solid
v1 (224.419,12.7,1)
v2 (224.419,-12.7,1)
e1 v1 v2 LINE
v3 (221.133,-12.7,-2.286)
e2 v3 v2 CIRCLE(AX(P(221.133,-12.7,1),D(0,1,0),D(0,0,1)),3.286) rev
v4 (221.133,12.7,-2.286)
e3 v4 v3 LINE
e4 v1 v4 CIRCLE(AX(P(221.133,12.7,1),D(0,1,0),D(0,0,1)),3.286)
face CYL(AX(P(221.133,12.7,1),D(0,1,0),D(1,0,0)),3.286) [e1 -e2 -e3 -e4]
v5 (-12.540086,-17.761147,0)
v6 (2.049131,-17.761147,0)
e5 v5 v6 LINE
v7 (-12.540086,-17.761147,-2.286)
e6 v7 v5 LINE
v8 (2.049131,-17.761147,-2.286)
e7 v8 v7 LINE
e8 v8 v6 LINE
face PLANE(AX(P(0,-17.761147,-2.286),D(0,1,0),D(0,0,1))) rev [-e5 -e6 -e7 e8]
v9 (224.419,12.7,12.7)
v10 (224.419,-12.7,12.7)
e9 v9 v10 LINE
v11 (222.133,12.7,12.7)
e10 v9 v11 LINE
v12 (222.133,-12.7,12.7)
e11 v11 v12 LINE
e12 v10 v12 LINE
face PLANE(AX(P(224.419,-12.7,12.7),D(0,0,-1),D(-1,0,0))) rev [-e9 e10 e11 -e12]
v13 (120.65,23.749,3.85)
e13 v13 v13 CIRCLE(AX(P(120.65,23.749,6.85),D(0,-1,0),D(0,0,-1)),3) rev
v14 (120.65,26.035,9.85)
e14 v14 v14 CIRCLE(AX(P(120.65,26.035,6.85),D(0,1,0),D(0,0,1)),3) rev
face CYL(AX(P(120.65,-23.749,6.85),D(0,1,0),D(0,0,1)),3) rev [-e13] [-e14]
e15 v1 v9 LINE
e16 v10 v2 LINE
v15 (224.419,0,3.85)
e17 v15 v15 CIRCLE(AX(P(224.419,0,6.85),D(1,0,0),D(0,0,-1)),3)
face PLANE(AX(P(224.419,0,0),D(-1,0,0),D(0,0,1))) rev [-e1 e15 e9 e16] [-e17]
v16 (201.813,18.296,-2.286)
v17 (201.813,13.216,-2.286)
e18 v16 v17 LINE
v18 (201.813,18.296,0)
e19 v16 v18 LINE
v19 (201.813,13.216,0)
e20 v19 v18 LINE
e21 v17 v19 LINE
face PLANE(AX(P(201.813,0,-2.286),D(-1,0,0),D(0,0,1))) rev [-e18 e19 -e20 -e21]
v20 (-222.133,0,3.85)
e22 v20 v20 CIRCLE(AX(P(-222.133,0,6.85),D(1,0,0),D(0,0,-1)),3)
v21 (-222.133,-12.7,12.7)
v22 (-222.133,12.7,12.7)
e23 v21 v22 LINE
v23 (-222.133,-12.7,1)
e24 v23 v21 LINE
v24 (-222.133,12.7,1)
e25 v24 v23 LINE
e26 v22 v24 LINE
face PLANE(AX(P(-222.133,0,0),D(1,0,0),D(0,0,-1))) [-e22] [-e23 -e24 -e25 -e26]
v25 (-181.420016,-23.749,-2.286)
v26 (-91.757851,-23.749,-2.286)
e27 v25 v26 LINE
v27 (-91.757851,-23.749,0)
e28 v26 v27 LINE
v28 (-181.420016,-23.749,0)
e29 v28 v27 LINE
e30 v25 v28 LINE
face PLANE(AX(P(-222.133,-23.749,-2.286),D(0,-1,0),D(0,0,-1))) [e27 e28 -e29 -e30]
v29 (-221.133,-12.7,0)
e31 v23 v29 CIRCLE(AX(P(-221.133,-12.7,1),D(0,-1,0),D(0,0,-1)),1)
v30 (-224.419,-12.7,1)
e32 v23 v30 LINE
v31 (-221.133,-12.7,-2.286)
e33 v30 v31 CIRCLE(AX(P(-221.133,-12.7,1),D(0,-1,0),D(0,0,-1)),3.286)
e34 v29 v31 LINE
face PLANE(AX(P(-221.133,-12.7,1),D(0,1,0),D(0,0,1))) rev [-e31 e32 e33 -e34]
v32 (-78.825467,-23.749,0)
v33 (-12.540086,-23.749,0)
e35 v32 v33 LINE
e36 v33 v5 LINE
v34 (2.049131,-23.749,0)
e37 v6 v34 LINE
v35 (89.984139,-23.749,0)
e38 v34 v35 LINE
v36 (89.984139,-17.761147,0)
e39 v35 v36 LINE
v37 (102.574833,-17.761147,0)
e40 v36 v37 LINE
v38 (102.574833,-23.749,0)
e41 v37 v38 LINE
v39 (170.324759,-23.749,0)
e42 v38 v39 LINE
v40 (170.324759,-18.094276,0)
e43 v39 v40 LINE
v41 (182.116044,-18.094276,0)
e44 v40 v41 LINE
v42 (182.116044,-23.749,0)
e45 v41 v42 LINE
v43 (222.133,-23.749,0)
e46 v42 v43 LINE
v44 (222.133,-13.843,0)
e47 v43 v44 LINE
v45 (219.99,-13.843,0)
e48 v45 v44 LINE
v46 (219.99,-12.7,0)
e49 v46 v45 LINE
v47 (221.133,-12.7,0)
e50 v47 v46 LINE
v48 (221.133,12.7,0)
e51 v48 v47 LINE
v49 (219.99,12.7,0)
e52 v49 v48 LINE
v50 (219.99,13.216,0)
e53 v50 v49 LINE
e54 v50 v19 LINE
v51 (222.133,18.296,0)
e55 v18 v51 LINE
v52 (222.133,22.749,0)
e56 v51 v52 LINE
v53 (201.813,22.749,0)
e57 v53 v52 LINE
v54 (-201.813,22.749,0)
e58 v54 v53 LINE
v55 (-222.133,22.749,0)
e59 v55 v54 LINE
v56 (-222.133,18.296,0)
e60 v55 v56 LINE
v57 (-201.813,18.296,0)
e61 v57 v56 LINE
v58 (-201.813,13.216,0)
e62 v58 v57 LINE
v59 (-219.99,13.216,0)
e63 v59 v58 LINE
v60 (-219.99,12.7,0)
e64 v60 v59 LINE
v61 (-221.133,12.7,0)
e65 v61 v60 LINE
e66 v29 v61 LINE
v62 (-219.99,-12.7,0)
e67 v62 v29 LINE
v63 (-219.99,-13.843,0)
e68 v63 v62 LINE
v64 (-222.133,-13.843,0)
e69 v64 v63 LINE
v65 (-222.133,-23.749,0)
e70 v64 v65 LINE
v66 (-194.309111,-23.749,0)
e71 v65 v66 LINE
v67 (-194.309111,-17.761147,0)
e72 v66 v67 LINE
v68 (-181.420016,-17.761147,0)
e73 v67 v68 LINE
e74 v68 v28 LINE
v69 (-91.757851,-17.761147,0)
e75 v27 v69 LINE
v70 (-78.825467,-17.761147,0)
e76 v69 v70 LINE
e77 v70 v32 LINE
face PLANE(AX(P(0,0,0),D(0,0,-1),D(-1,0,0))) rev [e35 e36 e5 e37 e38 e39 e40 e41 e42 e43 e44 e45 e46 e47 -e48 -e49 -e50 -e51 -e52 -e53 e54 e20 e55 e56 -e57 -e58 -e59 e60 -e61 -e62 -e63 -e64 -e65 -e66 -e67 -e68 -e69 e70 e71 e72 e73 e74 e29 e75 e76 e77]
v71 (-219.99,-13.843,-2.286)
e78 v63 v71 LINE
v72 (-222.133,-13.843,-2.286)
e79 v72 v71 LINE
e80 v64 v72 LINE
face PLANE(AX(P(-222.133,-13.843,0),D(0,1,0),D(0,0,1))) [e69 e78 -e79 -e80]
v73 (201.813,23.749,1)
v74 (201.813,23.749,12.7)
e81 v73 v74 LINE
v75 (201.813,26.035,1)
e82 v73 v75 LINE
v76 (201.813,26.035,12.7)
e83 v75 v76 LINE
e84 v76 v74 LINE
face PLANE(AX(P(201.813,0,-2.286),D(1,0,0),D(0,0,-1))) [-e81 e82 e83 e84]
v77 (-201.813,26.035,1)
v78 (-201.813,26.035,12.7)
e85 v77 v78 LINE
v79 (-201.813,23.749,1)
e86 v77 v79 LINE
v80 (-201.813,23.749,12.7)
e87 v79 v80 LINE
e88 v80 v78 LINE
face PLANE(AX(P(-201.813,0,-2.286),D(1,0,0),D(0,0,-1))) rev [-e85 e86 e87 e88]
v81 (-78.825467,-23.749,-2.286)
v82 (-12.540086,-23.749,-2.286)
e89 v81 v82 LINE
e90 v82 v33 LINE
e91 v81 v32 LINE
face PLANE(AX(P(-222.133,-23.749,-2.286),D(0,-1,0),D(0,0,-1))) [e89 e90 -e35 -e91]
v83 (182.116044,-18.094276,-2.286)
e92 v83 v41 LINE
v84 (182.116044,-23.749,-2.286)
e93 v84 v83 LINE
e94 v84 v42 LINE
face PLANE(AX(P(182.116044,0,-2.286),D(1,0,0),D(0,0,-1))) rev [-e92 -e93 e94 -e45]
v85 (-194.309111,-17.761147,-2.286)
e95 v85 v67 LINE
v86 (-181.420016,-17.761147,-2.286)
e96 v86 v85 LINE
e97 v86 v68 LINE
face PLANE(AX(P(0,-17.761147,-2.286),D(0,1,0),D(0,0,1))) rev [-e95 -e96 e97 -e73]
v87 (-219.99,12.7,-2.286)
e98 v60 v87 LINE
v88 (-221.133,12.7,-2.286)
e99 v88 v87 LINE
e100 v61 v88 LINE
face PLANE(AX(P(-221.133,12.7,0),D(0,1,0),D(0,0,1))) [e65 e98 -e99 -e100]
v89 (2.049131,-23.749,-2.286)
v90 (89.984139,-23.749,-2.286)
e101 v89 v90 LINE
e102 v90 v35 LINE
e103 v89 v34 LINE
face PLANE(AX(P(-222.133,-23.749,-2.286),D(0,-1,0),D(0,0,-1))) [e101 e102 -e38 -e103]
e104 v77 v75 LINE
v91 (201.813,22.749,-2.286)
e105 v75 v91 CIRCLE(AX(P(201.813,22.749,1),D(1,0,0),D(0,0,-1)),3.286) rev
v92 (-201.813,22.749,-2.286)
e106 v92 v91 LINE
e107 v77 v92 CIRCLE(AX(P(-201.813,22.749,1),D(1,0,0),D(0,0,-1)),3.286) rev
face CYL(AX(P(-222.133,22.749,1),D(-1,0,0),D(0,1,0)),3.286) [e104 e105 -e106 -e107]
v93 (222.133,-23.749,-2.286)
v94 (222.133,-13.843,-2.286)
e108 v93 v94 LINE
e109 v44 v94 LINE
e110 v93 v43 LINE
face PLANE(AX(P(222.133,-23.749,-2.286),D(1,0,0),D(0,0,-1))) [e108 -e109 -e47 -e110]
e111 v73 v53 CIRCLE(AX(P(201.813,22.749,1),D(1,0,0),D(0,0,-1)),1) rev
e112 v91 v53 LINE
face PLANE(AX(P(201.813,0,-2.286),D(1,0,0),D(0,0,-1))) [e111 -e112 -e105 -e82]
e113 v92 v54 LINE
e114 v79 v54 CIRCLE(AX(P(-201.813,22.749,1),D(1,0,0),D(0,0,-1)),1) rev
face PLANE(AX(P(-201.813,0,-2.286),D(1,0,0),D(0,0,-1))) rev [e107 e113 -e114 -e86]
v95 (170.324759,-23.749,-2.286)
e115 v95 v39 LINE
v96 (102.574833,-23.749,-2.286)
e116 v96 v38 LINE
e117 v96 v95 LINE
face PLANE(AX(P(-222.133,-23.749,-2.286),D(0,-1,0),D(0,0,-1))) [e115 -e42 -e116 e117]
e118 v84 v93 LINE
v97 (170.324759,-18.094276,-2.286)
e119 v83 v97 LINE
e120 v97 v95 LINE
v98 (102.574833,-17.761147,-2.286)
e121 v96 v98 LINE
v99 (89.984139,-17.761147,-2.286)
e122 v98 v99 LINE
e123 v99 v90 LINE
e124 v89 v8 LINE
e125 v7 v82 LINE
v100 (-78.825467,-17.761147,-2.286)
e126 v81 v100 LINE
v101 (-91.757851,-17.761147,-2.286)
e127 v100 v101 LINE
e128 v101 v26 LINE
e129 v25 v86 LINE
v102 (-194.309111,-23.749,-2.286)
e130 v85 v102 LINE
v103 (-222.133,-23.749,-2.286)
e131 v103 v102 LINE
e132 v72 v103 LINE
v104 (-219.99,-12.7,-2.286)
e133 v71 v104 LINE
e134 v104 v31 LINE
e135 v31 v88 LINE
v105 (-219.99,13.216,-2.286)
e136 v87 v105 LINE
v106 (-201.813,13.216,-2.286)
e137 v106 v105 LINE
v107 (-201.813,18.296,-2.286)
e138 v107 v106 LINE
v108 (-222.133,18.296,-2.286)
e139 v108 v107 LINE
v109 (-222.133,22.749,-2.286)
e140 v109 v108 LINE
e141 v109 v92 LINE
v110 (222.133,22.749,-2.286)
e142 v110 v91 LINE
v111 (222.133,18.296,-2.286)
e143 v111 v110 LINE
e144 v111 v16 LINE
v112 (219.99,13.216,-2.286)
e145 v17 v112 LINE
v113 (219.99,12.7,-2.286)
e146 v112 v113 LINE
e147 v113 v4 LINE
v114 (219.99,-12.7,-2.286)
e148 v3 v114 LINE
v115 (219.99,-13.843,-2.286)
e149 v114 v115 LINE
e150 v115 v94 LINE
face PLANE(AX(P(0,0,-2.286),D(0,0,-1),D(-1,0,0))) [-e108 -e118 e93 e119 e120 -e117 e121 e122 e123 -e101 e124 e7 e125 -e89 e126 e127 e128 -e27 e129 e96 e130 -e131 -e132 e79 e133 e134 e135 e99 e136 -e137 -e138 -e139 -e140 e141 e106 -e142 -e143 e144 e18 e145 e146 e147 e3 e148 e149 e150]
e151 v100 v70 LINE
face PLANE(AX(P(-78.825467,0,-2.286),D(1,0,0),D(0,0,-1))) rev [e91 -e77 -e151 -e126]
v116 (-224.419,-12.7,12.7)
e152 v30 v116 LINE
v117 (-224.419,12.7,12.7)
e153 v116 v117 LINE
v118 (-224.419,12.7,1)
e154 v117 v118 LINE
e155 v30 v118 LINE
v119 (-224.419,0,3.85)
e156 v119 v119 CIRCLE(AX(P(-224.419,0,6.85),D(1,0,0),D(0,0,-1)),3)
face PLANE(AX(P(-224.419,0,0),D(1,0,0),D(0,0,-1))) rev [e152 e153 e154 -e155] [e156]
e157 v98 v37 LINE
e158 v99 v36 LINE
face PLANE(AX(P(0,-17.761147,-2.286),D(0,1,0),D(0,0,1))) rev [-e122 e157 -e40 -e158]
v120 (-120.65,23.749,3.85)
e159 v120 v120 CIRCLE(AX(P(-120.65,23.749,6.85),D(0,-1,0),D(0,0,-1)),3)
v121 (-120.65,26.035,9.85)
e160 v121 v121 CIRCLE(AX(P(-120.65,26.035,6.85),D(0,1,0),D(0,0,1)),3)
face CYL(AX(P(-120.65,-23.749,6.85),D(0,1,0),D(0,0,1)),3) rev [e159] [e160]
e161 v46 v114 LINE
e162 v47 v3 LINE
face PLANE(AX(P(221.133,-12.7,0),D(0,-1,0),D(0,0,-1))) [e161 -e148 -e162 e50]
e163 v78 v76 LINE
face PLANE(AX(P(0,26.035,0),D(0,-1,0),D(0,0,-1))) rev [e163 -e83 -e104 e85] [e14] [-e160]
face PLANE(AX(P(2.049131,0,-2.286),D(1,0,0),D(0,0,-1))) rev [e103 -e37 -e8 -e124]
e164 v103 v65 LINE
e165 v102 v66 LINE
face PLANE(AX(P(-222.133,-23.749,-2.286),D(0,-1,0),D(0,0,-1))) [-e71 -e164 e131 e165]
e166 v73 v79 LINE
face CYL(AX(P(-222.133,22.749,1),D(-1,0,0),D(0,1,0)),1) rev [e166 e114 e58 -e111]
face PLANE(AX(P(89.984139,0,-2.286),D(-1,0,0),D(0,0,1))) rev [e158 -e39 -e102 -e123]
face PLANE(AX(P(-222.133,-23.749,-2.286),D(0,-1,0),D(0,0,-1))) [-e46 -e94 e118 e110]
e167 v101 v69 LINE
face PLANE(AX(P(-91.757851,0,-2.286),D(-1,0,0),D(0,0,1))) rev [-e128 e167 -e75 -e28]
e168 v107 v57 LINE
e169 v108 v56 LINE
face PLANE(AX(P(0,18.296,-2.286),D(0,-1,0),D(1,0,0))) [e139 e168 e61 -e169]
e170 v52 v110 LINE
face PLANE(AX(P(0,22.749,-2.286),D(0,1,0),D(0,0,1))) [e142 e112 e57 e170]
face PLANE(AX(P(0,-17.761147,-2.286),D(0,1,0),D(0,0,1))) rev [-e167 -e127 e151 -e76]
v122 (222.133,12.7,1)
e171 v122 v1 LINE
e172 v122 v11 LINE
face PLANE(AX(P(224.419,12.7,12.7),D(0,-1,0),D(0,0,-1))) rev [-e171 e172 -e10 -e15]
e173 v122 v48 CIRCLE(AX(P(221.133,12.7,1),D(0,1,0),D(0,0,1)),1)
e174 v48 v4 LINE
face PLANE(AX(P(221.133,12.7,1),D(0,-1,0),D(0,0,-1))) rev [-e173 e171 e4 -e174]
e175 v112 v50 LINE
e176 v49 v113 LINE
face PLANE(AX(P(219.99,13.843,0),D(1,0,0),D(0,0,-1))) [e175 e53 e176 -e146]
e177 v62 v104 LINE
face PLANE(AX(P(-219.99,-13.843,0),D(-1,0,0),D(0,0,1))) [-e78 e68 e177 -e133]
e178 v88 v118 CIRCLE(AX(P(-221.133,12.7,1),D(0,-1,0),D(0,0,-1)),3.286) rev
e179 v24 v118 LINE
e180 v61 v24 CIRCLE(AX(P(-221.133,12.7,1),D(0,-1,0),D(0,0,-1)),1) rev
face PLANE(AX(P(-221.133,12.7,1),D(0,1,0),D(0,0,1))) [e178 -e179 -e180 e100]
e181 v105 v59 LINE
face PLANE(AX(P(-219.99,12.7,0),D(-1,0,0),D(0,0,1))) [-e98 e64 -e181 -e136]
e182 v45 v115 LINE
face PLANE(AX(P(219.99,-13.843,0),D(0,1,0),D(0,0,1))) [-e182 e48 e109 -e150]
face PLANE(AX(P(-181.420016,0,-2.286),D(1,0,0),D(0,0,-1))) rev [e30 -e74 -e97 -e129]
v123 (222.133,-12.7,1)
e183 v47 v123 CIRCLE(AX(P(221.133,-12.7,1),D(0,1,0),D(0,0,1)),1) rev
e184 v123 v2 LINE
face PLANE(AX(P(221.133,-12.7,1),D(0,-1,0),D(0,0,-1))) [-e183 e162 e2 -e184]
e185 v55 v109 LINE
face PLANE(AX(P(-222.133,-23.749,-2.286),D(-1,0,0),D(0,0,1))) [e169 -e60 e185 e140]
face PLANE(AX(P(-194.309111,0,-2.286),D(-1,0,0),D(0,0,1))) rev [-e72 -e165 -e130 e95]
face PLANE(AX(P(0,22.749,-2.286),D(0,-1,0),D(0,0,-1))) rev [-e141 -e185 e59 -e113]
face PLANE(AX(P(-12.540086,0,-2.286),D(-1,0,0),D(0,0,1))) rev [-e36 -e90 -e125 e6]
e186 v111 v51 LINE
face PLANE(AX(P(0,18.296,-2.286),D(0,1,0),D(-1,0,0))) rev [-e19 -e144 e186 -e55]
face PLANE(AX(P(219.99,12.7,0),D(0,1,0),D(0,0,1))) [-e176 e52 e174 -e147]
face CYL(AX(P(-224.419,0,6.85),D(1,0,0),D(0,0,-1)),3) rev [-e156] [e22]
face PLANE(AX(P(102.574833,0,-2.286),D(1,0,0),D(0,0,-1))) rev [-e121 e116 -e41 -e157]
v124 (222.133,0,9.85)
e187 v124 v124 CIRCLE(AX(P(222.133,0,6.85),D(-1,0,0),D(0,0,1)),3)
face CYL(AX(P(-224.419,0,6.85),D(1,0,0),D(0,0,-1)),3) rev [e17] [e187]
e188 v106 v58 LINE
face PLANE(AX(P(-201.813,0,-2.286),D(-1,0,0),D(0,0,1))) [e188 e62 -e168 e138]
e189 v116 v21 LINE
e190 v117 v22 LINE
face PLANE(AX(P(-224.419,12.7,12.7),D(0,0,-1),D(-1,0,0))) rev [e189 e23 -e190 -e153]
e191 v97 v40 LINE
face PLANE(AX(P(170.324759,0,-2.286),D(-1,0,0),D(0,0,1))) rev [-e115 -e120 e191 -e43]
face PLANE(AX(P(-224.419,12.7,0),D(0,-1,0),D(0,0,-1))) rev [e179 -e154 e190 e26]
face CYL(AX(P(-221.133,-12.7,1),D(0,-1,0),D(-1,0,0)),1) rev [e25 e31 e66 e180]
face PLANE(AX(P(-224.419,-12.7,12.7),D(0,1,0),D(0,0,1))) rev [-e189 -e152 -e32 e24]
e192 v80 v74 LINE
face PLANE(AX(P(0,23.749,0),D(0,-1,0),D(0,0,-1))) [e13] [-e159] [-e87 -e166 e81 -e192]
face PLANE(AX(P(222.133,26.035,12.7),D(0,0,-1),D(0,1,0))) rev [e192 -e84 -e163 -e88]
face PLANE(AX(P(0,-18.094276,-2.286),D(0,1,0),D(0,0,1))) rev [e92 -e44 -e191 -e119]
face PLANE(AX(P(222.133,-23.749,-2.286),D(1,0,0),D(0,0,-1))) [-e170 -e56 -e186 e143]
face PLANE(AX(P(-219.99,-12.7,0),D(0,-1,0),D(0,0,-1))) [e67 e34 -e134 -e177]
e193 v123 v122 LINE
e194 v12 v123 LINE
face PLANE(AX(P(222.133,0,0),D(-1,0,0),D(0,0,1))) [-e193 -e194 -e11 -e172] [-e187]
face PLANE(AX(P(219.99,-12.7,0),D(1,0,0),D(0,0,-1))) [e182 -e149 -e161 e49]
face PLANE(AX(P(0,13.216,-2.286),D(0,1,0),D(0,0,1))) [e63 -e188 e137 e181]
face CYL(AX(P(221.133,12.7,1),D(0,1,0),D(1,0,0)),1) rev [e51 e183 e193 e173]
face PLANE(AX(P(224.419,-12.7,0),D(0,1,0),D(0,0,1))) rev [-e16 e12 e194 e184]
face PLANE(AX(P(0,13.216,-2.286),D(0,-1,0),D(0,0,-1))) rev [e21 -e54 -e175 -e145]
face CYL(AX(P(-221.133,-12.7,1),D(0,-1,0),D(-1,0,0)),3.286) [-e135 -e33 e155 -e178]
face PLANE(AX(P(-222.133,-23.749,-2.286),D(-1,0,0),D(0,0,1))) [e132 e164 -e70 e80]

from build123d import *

# Parameters (mm, degrees)
SKETCH1_W                     = 444.26599996
SKETCH1_H                     = 47.498
BASE_FLANGE1_DEPTH            = 2.286
EDGE_FLANGE1_STRIP_W          = 11.144
EDGE_FLANGE1_STRIP_H          = 2.286
EDGE_FLANGE1_STRIP_CUT_DEPTH  = 25.4
EDGE_FLANGE1_RELIEF_W         = 12.287
EDGE_FLANGE1_RELIEF_H         = 1.143
EDGE_FLANGE1_RELIEF_CUT_DEPTH = 2.286
EDGE_FLANGE1_DEPTH            = 25.4
EDGE_FLANGE2_STRIP_W          = 11.144
EDGE_FLANGE2_STRIP_H          = 2.286
EDGE_FLANGE2_STRIP_CUT_DEPTH  = 25.4
EDGE_FLANGE2_RELIEF_W         = 12.287
EDGE_FLANGE2_RELIEF_H         = 1.143
EDGE_FLANGE2_RELIEF_CUT_DEPTH = 2.286
EDGE_FLANGE2_DEPTH            = 25.4
EDGE_FLANGE6_STRIP_W          = 11.144
EDGE_FLANGE6_STRIP_H          = 2.286
EDGE_FLANGE6_STRIP_CUT_DEPTH  = 444.26599996
EDGE_FLANGE6_DEPTH            = 444.26599996
SKETCH52_R                    = 3
CUT_EXTRUDE2_DEPTH            = 231.225159807
SKETCH53_R                    = 3
CUT_EXTRUDE3_DEPTH            = 450.771788169
SKETCH54_W                    = 20.32
SKETCH54_H                    = 3.286
CUT_EXTRUDE4_DEPTH            = 227.280796306
CUT_EXTRUDE6_DEPTH            = 227.280796306
CUT_EXTRUDE6_DEPTH_BACK       = 227.280796306
SKETCH57_W                    = 12.932384232
SKETCH57_H                    = 5.987852531
SKETCH57_W_2                  = 12.889095721
SKETCH57_H_2                  = 5.98785253
SKETCH57_W_3                  = 14.589217144
SKETCH57_H_3                  = 5.987852532
SKETCH57_W_4                  = 12.590694247
SKETCH57_H_4                  = 5.987852533
SKETCH57_W_5                  = 11.791285089
SKETCH57_H_5                  = 5.654723841


# Sheet-metal steps are written as plain solids
with BuildPart() as part:
    # Sketch1 → Base-Flange1 (new body)
    with BuildSketch(Plane.XY):
        Rectangle(SKETCH1_W, SKETCH1_H)
    extrude(amount=-BASE_FLANGE1_DEPTH)

    # Edge-Flange1 strip (across the edge) → Edge-Flange1 strip cut (cut)
    with BuildSketch(Plane(origin=(222.13299998, -12.7, 0), x_dir=(-1, 0, 0), z_dir=(0, 1, 0))):
        with Locations((-4.572, -1.143)):
            Rectangle(EDGE_FLANGE1_STRIP_W, EDGE_FLANGE1_STRIP_H)
    extrude(amount=EDGE_FLANGE1_STRIP_CUT_DEPTH, mode=Mode.SUBTRACT)

    # Edge-Flange1 relief (on the sheet) → Edge-Flange1 relief cut (cut)
    with BuildSketch(Plane(origin=(221.13299998, -12.7, 0), x_dir=(-1, 0, 0), z_dir=(0, 0, 1))):
        with Locations((-5.0005, 0.5715)):
            Rectangle(EDGE_FLANGE1_RELIEF_W, EDGE_FLANGE1_RELIEF_H)
        with Locations((-5.0005, -25.9715)):
            Rectangle(EDGE_FLANGE1_RELIEF_W, EDGE_FLANGE1_RELIEF_H)
    extrude(amount=-EDGE_FLANGE1_RELIEF_CUT_DEPTH, mode=Mode.SUBTRACT)

    # Edge-Flange1 section (across the edge) → Edge-Flange1 (add)
    with BuildSketch(Plane(origin=(222.13299998, -12.7, 0), x_dir=(-1, 0, 0), z_dir=(0, 1, 0))):
        with BuildLine():
            Line((-2.286, 1), (-2.286, 12.7))
            Line((-2.286, 12.7), (0, 12.7))
            Line((0, 12.7), (0, 1))
            ThreePointArc((0, 1), (0.292893219, 0.292893219), (1, 0))
            Line((1, 0), (1, -2.286))
            ThreePointArc((1, -2.286), (-1.323552883, -1.323552883), (-2.286, 1))
        make_face()
    extrude(amount=EDGE_FLANGE1_DEPTH)

    # Edge-Flange2 strip (across the edge) → Edge-Flange2 strip cut (cut)
    with BuildSketch(Plane(origin=(-222.13299998, 12.7, 0), x_dir=(1, 0, 0), z_dir=(0, -1, 0))):
        with Locations((-4.572, -1.143)):
            Rectangle(EDGE_FLANGE2_STRIP_W, EDGE_FLANGE2_STRIP_H)
    extrude(amount=EDGE_FLANGE2_STRIP_CUT_DEPTH, mode=Mode.SUBTRACT)

    # Edge-Flange2 relief (on the sheet) → Edge-Flange2 relief cut (cut)
    with BuildSketch(Plane(origin=(-221.13299998, 12.7, 0), x_dir=(1, 0, 0), z_dir=(0, 0, 1))):
        with Locations((-5.0005, 0.5715)):
            Rectangle(EDGE_FLANGE2_RELIEF_W, EDGE_FLANGE2_RELIEF_H)
        with Locations((-5.0005, -25.9715)):
            Rectangle(EDGE_FLANGE2_RELIEF_W, EDGE_FLANGE2_RELIEF_H)
    extrude(amount=-EDGE_FLANGE2_RELIEF_CUT_DEPTH, mode=Mode.SUBTRACT)

    # Edge-Flange2 section (across the edge) → Edge-Flange2 (add)
    with BuildSketch(Plane(origin=(-222.13299998, 12.7, 0), x_dir=(1, 0, 0), z_dir=(0, -1, 0))):
        with BuildLine():
            Line((-2.286, 1), (-2.286, 12.7))
            Line((-2.286, 12.7), (0, 12.7))
            Line((0, 12.7), (0, 1))
            ThreePointArc((0, 1), (0.292893219, 0.292893219), (1, 0))
            Line((1, 0), (1, -2.286))
            ThreePointArc((1, -2.286), (-1.323552883, -1.323552883), (-2.286, 1))
        make_face()
    extrude(amount=EDGE_FLANGE2_DEPTH)

    # Edge-Flange6 strip (across the edge) → Edge-Flange6 strip cut (cut)
    with BuildSketch(Plane(origin=(222.13299998, 23.749, 0), x_dir=(0, -1, 0), z_dir=(-1, 0, 0))):
        with Locations((-4.572, -1.143)):
            Rectangle(EDGE_FLANGE6_STRIP_W, EDGE_FLANGE6_STRIP_H)
    extrude(amount=EDGE_FLANGE6_STRIP_CUT_DEPTH, mode=Mode.SUBTRACT)

    # Edge-Flange6 section (across the edge) → Edge-Flange6 (add)
    with BuildSketch(Plane(origin=(222.13299998, 23.749, 0), x_dir=(0, -1, 0), z_dir=(-1, 0, 0))):
        with BuildLine():
            Line((-2.286, 1), (-2.286, 12.7))
            Line((-2.286, 12.7), (0, 12.7))
            Line((0, 12.7), (0, 1))
            ThreePointArc((0, 1), (0.292893219, 0.292893219), (1, 0))
            Line((1, 0), (1, -2.286))
            ThreePointArc((1, -2.286), (-1.323552883, -1.323552883), (-2.286, 1))
        make_face()
    extrude(amount=EDGE_FLANGE6_DEPTH)

    # Sketch52 → Cut-Extrude2 (cut, through all)
    with BuildSketch(Plane(origin=(0, 26.035, 0), x_dir=(1, 0, 0), z_dir=(0, 1, 0))):
        with Locations(Location((120.65, -6.85, 0), (0, 0, 270))):
            Circle(SKETCH52_R)
        with Locations(Location((-120.65, -6.85, 0), (0, 0, 270))):
            Circle(SKETCH52_R)
    extrude(amount=-CUT_EXTRUDE2_DEPTH, mode=Mode.SUBTRACT)

    # Sketch53 → Cut-Extrude3 (cut, through all)
    with BuildSketch(Plane(origin=(224.41899998, 0, 0), x_dir=(0, 0, -1), z_dir=(1, 0, 0))):
        with Locations((-6.85, 0)):
            Circle(SKETCH53_R)
    extrude(amount=-CUT_EXTRUDE3_DEPTH, mode=Mode.SUBTRACT)

    # Sketch54 → Cut-Extrude4 (cut, symmetric)
    with BuildSketch(Plane.XY):
        Polygon((222.13299998, 13.843), (222.13299998, 18.296), (201.81299998, 18.296), (201.81299998, 13.216), (219.98999998, 13.216), (219.98999998, 13.843), align=None)
        with Locations((211.97299998, 24.392)):
            Rectangle(SKETCH54_W, SKETCH54_H)
    cut_extrude4 = extrude(amount=CUT_EXTRUDE4_DEPTH, both=True, mode=Mode.SUBTRACT)

    # Mirror1: Cut-Extrude4 across plane
    add(cut_extrude4.mirror(Plane(origin=(0, 0, 0), x_dir=(0, 0, 1), z_dir=(1, 0, 0))), mode=Mode.SUBTRACT)

    # Sketch57 → Cut-Extrude6 (cut, two sides: drawn at the far end of the back side and taken through both)
    with BuildSketch(Plane.XY.offset(-CUT_EXTRUDE6_DEPTH_BACK)):
        with Locations((-85.29165905, -20.755073735)):
            Rectangle(SKETCH57_W, SKETCH57_H)
        with Locations((-187.864563379, -20.755073735)):
            Rectangle(SKETCH57_W_2, SKETCH57_H_2)
        with Locations((-5.245477464, -20.755073734)):
            Rectangle(SKETCH57_W_3, SKETCH57_H_3)
        with Locations((96.279485673, -20.755073734)):
            Rectangle(SKETCH57_W_4, SKETCH57_H_4)
        with Locations((176.220401529, -20.921638079)):
            Rectangle(SKETCH57_W_5, SKETCH57_H_5)
    extrude(amount=CUT_EXTRUDE6_DEPTH + CUT_EXTRUDE6_DEPTH_BACK, mode=Mode.SUBTRACT)


solid = part.part
